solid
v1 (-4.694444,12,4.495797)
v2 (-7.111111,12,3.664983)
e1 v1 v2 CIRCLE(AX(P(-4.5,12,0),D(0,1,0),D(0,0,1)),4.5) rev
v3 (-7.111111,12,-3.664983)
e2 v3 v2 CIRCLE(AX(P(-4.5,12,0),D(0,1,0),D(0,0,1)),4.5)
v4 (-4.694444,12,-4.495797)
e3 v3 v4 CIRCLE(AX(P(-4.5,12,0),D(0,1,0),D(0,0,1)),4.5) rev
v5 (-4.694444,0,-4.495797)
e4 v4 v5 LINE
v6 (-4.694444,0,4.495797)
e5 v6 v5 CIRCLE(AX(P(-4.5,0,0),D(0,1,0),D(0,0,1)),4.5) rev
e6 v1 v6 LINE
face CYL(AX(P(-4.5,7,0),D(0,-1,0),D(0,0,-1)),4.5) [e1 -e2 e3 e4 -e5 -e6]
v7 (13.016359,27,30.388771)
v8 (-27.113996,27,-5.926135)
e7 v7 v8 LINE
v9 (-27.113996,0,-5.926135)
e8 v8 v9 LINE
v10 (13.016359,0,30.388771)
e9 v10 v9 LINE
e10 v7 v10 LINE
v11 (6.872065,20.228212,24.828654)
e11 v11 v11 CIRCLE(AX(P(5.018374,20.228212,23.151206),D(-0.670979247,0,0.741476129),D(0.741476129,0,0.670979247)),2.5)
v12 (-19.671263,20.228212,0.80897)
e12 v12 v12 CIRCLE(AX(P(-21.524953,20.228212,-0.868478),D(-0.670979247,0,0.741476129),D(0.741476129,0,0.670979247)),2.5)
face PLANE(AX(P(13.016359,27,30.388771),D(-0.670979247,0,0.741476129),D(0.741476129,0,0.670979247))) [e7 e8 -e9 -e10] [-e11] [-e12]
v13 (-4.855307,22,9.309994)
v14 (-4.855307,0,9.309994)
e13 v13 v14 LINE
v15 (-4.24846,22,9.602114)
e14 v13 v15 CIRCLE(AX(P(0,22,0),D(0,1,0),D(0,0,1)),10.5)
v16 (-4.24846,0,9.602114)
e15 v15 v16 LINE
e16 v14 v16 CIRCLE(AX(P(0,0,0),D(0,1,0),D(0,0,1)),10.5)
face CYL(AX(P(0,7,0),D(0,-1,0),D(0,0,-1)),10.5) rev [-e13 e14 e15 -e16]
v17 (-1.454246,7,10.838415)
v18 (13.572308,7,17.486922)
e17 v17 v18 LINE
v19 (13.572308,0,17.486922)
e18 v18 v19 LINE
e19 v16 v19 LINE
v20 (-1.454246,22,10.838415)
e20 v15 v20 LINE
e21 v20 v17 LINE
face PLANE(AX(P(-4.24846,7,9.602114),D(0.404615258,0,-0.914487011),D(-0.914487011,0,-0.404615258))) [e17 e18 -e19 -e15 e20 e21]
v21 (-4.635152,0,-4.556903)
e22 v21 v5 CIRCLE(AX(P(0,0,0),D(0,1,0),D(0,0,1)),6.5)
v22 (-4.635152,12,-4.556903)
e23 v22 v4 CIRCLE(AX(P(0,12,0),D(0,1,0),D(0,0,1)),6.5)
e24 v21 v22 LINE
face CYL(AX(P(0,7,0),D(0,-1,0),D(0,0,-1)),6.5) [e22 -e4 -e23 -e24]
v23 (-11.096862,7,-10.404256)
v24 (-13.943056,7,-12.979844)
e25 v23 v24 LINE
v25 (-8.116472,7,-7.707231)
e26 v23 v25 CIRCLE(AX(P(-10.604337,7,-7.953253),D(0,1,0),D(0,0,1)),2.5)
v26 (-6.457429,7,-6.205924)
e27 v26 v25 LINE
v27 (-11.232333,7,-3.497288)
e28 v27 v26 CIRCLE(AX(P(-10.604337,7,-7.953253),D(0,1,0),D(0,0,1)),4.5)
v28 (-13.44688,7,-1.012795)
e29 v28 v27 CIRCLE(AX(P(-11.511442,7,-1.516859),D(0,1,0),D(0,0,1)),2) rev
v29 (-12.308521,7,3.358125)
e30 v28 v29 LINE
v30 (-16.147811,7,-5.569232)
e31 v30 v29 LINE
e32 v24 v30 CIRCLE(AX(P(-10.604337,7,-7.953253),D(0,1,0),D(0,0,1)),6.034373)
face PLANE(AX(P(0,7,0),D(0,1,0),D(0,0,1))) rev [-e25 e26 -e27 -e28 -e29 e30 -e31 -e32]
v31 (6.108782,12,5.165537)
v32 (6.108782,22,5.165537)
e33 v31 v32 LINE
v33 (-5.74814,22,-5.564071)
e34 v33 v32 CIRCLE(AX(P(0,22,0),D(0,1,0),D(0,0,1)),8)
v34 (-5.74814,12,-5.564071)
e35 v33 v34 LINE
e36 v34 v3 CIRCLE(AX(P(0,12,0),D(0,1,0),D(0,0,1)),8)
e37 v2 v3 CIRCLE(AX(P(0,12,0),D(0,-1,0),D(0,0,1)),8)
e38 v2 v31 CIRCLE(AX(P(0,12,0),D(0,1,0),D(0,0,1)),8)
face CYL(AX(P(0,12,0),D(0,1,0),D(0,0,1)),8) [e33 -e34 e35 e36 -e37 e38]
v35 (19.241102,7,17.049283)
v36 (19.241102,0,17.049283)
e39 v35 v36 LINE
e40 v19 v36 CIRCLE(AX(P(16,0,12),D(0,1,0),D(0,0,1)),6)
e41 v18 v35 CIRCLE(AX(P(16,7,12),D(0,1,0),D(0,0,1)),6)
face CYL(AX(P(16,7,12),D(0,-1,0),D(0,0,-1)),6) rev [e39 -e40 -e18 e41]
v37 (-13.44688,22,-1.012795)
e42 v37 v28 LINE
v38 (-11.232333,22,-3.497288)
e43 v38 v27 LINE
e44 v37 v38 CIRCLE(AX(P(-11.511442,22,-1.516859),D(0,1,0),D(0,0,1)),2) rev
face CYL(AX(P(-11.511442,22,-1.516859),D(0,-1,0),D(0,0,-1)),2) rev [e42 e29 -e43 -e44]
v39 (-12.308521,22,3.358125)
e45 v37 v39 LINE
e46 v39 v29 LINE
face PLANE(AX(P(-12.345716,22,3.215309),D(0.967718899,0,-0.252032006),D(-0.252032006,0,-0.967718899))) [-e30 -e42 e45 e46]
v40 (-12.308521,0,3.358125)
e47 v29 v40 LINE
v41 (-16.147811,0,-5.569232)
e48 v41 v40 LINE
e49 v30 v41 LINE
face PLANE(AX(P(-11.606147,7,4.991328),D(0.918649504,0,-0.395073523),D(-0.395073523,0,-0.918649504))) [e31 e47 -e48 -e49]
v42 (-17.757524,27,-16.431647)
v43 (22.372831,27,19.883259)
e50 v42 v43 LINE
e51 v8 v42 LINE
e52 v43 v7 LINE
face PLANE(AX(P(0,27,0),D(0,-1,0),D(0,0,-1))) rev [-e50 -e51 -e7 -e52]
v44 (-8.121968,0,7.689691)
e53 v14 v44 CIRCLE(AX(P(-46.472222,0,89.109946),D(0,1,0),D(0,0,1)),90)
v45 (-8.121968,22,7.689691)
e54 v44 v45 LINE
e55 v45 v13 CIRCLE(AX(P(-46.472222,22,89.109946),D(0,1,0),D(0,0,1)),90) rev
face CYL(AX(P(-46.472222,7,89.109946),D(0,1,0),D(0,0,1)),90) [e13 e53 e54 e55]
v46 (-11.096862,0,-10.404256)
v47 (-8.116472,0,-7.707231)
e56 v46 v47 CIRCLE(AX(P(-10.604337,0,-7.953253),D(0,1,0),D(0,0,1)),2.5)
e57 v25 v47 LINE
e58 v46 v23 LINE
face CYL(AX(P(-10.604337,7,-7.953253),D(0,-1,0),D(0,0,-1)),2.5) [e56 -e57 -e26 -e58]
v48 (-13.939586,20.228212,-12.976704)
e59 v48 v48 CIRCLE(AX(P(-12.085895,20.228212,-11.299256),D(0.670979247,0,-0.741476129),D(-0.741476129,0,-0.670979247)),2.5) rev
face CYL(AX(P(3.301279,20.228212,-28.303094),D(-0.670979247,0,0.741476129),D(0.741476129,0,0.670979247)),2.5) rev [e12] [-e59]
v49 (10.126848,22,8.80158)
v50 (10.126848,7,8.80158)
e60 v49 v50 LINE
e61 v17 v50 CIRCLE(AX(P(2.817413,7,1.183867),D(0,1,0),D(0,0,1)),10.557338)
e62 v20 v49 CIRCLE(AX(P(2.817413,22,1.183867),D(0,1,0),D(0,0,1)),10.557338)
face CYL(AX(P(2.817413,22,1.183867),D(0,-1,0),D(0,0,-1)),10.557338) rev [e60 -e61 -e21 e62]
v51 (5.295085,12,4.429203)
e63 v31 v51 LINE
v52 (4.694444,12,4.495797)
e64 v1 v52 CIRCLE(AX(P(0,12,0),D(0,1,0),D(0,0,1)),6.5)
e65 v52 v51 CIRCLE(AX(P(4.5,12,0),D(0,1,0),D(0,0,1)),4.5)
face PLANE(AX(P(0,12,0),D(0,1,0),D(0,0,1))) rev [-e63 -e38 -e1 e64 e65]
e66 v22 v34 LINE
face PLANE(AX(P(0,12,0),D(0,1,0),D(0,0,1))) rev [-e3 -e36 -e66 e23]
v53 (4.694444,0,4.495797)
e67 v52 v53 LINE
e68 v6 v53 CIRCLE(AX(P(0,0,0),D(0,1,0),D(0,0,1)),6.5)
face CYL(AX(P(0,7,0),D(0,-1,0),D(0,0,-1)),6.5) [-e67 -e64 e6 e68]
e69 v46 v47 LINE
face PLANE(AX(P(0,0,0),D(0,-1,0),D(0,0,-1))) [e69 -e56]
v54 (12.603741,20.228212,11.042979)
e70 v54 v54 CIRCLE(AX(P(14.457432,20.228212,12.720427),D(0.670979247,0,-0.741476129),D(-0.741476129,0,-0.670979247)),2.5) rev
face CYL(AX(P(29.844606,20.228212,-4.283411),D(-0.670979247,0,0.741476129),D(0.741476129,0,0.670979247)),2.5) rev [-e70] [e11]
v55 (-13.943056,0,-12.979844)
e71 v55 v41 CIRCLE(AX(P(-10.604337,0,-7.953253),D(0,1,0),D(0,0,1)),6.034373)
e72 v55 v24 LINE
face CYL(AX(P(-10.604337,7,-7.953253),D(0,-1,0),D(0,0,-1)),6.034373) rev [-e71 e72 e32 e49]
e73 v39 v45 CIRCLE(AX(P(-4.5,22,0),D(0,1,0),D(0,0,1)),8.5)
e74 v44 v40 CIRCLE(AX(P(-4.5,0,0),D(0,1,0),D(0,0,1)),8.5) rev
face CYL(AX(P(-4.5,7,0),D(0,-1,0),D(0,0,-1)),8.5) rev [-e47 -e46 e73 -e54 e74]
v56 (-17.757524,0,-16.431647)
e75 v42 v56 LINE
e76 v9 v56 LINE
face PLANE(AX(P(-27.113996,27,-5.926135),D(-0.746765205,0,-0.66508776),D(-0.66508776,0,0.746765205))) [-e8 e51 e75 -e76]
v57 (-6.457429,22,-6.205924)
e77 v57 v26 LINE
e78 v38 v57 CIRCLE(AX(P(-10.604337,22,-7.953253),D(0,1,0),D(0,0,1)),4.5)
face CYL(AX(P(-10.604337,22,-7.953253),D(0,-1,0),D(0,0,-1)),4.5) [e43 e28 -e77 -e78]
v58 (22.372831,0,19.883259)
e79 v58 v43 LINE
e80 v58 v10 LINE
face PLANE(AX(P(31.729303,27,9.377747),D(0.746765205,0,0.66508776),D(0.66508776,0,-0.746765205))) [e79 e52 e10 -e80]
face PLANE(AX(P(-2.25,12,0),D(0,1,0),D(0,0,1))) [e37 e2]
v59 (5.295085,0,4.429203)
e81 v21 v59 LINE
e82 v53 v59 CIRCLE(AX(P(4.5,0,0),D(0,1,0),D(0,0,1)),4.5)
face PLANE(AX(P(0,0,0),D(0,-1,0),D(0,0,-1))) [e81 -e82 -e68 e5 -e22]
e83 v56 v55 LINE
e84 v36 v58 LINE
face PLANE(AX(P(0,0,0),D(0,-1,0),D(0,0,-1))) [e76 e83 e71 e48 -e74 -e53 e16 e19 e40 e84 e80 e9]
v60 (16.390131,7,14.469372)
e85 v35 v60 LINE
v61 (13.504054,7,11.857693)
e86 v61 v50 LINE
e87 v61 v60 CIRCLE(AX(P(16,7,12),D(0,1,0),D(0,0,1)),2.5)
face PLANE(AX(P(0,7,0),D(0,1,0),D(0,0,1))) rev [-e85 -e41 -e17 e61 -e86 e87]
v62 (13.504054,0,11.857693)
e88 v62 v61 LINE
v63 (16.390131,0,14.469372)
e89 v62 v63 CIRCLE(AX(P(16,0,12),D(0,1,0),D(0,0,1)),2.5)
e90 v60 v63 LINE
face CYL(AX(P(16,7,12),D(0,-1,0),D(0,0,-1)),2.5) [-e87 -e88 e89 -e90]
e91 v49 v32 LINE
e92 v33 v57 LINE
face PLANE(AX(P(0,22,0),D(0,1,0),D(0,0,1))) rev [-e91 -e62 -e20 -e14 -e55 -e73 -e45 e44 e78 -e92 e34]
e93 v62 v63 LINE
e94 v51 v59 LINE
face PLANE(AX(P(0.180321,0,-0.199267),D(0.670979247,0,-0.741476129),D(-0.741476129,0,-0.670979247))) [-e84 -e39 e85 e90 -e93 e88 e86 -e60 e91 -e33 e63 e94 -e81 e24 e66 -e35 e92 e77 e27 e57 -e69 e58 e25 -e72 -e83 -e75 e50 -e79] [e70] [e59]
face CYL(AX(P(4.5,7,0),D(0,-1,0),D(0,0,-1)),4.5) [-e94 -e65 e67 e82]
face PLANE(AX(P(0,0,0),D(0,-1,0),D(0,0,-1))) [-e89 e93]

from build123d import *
from build123d.topology import SkipClean

# Parameters (mm, degrees)
SKETCH2_R           = 2.5
BOSS_EXTRUDE1_DEPTH = 7
FILLET1_R           = 90
BOSS_EXTRUDE3_DEPTH = 15
SKETCH4_R           = 8
CUT_EXTRUDE1_DEPTH  = 10
BOSS_EXTRUDE4_START = 10
BOSS_EXTRUDE4_DEPTH = 10
BOSS_EXTRUDE5_DEPTH = 27
SKETCH7_R           = 2.5
CUT_EXTRUDE2_DEPTH  = 37
INTERSECT3_DEPTH    = 27


with BuildPart() as part:
    # Sketch2 → Boss-Extrude1 (new body)
    with BuildSketch(Plane(origin=(0, 0, 0), x_dir=(1, 0, 0), z_dir=(0, 1, 0))):
        with BuildLine():
            Line((-4.24846021, -9.602113613), (13.572308451, -17.486922065))
            ThreePointArc((13.572308451, -17.486922065), (20.638500285, -15.805826469), (20.907079545, -8.547382103))
            Line((20.907079545, -8.547382103), (11.451696022, 4.891208687))
            ThreePointArc((11.451696022, 4.891208687), (9.270724445, 7.034926316), (6.472222222, 8.268031175))
            ThreePointArc((6.472222222, 8.268031175), (4.86754966, 9.30359932), (3.101845071, 10.031378627))
            Line((3.101845071, 10.031378627), (-8.821699821, 13.718308443))
            ThreePointArc((-8.821699821, 13.718308443), (-15.091857172, 11.987583677), (-16.147811194, 5.569231667))
            Line((-16.147811194, 5.569231667), (-12.308520784, -3.358124948))
            ThreePointArc((-12.308520784, -3.358124948), (-9.971976629, -6.504419403), (-6.472222222, -8.268031175))
            ThreePointArc((-6.472222222, -8.268031175), (-5.401685102, -9.003987898), (-4.24846021, -9.602113613))
        make_face()
        with Locations(Location((16, -12, 0), (0, 0, 270))):
            Circle(SKETCH2_R, mode=Mode.SUBTRACT)
        with Locations(Location((-10.604337088, 7.953252816, 0), (0, 0, 270))):
            Circle(SKETCH2_R, mode=Mode.SUBTRACT)
        with BuildLine():
            ThreePointArc((-4.694444444, -4.495797077), (0, -6.5), (4.694444444, -4.495797077))
            ThreePointArc((4.694444444, -4.495797077), (9, 0), (4.694444444, 4.495797077))
            ThreePointArc((4.694444444, 4.495797077), (0, 6.5), (-4.694444444, 4.495797077))
            ThreePointArc((-4.694444444, 4.495797077), (-9, 0), (-4.694444444, -4.495797077))
        make_face(mode=Mode.SUBTRACT)
    extrude(amount=BOSS_EXTRUDE1_DEPTH)

    # Fillet1
    fillet1_edges = [part.edges().sort_by_distance(p)[0] for p in [
        (6.472222222, 3.5, -8.268031175),
        (-6.472222222, 3.5, 8.268031175),
    ]]
    fillet(fillet1_edges, radius=FILLET1_R)

    # Sketch3 → Boss-Extrude3 (add)
    with BuildSketch(Plane(origin=(0, 7, 0), x_dir=(1, 0, 0), z_dir=(0, 1, 0))):
        with BuildLine():
            Line((-13.446880098, 1.012795393), (-12.308520784, -3.358124948))
            ThreePointArc((-12.308520784, -3.358124948), (-10.611843956, -5.907229762), (-8.121968415, -7.689690813))
            ThreePointArc((-8.121968415, -7.689690813), (-6.480430757, -8.483296944), (-4.855306799, -9.309994408))
            ThreePointArc((-4.855306799, -9.309994408), (-4.554226262, -9.460920841), (-4.24846021, -9.602113613))
            Line((-4.24846021, -9.602113613), (-1.454246479, -10.838414946))
            ThreePointArc((-1.454246479, -10.838414946), (10.979115699, -7.880432641), (11.451696022, 4.891208687))
            ThreePointArc((11.451696022, 4.891208687), (9.968863726, 6.507036925), (8.121968415, 7.689690813))
            ThreePointArc((8.121968415, 7.689690813), (6.480430757, 8.483296944), (4.855306799, 9.309994408))
            ThreePointArc((4.855306799, 9.309994408), (3.994892398, 9.710346787), (3.101845071, 10.031378627))
            Line((3.101845071, 10.031378627), (-3.895223267, 11.305534387))
            ThreePointArc((-3.895223267, 11.305534387), (-5.691953988, 10.727471116), (-6.207623157, 8.911848981))
            ThreePointArc((-6.207623157, 8.911848981), (-7.30582589, 4.892236012), (-11.232333003, 3.497288147))
            ThreePointArc((-11.232333003, 3.497288147), (-13.004436636, 2.847636589), (-13.446880098, 1.012795393))
        make_face()
        with BuildLine():
            ThreePointArc((4.694444444, -4.495797077), (9, 0), (4.694444444, 4.495797077))
            ThreePointArc((4.694444444, 4.495797077), (0, 6.5), (-4.694444444, 4.495797077))
            ThreePointArc((-4.694444444, 4.495797077), (-9, 0), (-4.694444444, -4.495797077))
            ThreePointArc((-4.694444444, -4.495797077), (0, -6.5), (4.694444444, -4.495797077))
        make_face(mode=Mode.SUBTRACT)
    extrude(amount=BOSS_EXTRUDE3_DEPTH)

    # Sketch4 → Cut-Extrude1 (cut)
    with BuildSketch(Plane(origin=(0, 22, 0), x_dir=(1, 0, 0), z_dir=(0, 1, 0))):
        Circle(SKETCH4_R)
    extrude(amount=-CUT_EXTRUDE1_DEPTH, mode=Mode.SUBTRACT)

    # Sketch5 → Boss-Extrude4 (add)
    with SkipClean():  # the faces are left unmerged after this step: merging them gives an invalid solid
        with BuildSketch(Plane(origin=(0, 12, 0), x_dir=(1, 0, 0), z_dir=(0, 1, 0)).offset(BOSS_EXTRUDE4_START)):
            with BuildLine():
                ThreePointArc((-7.111111111, 3.664982778), (-8, 0), (-7.111111111, -3.664982778))
                ThreePointArc((-7.111111111, -3.664982778), (-9, 0), (-7.111111111, 3.664982778))
            make_face()
            with BuildLine():
                ThreePointArc((7.111111111, -3.664982778), (9, 0), (7.111111111, 3.664982778))
                ThreePointArc((7.111111111, 3.664982778), (8, 0), (7.111111111, -3.664982778))
            make_face()
        extrude(amount=-BOSS_EXTRUDE4_DEPTH)


with BuildPart() as body_2:
    # Sketch6 → Boss-Extrude5 (new body)
    with BuildSketch(Plane(origin=(0, 0, 0), x_dir=(-1, 0, 0), z_dir=(0, -1, 0))):
        Polygon((8.401052482, 26.937158796), (-31.729302738, -9.377746691), (-13.016359271, -30.388770935), (27.113995949, 5.926134553), align=None)
    extrude(amount=-BOSS_EXTRUDE5_DEPTH)

    # Sketch7 → Cut-Extrude2 (cut)
    with BuildSketch(Plane(origin=(-9.25873614, 0, 10.23151142), x_dir=(0.7414761288495602, 0, 0.670979247329059), z_dir=(-0.670979247329059, 0, 0.7414761288495602))):
        with Locations((-16.542969249, 20.228212297)):
            Circle(SKETCH7_R)
        with Locations((19.254983261, 20.228212297)):
            Circle(SKETCH7_R)
    extrude(amount=-CUT_EXTRUDE2_DEPTH, mode=Mode.SUBTRACT)

    # Intersect1: read off the stored shape, not the designer's step
    # Intersect1: cut part
    add(part.part, mode=Mode.SUBTRACT)

    # Intersect3: read off the stored shape, not the designer's step
    # Intersect3 outline → Intersect3 (cut)
    with BuildSketch(Plane(origin=(0, 0, 0), x_dir=(1, 0, 0), z_dir=(0, 1, 0))):
        Polygon((22.372831004, -19.883258813), (31.729302738, -9.377746691), (-8.401052482, 26.937158796), (-17.757524215, 16.431646675), align=None)
    extrude(amount=INTERSECT3_DEPTH, mode=Mode.SUBTRACT)


solid = body_2.part
